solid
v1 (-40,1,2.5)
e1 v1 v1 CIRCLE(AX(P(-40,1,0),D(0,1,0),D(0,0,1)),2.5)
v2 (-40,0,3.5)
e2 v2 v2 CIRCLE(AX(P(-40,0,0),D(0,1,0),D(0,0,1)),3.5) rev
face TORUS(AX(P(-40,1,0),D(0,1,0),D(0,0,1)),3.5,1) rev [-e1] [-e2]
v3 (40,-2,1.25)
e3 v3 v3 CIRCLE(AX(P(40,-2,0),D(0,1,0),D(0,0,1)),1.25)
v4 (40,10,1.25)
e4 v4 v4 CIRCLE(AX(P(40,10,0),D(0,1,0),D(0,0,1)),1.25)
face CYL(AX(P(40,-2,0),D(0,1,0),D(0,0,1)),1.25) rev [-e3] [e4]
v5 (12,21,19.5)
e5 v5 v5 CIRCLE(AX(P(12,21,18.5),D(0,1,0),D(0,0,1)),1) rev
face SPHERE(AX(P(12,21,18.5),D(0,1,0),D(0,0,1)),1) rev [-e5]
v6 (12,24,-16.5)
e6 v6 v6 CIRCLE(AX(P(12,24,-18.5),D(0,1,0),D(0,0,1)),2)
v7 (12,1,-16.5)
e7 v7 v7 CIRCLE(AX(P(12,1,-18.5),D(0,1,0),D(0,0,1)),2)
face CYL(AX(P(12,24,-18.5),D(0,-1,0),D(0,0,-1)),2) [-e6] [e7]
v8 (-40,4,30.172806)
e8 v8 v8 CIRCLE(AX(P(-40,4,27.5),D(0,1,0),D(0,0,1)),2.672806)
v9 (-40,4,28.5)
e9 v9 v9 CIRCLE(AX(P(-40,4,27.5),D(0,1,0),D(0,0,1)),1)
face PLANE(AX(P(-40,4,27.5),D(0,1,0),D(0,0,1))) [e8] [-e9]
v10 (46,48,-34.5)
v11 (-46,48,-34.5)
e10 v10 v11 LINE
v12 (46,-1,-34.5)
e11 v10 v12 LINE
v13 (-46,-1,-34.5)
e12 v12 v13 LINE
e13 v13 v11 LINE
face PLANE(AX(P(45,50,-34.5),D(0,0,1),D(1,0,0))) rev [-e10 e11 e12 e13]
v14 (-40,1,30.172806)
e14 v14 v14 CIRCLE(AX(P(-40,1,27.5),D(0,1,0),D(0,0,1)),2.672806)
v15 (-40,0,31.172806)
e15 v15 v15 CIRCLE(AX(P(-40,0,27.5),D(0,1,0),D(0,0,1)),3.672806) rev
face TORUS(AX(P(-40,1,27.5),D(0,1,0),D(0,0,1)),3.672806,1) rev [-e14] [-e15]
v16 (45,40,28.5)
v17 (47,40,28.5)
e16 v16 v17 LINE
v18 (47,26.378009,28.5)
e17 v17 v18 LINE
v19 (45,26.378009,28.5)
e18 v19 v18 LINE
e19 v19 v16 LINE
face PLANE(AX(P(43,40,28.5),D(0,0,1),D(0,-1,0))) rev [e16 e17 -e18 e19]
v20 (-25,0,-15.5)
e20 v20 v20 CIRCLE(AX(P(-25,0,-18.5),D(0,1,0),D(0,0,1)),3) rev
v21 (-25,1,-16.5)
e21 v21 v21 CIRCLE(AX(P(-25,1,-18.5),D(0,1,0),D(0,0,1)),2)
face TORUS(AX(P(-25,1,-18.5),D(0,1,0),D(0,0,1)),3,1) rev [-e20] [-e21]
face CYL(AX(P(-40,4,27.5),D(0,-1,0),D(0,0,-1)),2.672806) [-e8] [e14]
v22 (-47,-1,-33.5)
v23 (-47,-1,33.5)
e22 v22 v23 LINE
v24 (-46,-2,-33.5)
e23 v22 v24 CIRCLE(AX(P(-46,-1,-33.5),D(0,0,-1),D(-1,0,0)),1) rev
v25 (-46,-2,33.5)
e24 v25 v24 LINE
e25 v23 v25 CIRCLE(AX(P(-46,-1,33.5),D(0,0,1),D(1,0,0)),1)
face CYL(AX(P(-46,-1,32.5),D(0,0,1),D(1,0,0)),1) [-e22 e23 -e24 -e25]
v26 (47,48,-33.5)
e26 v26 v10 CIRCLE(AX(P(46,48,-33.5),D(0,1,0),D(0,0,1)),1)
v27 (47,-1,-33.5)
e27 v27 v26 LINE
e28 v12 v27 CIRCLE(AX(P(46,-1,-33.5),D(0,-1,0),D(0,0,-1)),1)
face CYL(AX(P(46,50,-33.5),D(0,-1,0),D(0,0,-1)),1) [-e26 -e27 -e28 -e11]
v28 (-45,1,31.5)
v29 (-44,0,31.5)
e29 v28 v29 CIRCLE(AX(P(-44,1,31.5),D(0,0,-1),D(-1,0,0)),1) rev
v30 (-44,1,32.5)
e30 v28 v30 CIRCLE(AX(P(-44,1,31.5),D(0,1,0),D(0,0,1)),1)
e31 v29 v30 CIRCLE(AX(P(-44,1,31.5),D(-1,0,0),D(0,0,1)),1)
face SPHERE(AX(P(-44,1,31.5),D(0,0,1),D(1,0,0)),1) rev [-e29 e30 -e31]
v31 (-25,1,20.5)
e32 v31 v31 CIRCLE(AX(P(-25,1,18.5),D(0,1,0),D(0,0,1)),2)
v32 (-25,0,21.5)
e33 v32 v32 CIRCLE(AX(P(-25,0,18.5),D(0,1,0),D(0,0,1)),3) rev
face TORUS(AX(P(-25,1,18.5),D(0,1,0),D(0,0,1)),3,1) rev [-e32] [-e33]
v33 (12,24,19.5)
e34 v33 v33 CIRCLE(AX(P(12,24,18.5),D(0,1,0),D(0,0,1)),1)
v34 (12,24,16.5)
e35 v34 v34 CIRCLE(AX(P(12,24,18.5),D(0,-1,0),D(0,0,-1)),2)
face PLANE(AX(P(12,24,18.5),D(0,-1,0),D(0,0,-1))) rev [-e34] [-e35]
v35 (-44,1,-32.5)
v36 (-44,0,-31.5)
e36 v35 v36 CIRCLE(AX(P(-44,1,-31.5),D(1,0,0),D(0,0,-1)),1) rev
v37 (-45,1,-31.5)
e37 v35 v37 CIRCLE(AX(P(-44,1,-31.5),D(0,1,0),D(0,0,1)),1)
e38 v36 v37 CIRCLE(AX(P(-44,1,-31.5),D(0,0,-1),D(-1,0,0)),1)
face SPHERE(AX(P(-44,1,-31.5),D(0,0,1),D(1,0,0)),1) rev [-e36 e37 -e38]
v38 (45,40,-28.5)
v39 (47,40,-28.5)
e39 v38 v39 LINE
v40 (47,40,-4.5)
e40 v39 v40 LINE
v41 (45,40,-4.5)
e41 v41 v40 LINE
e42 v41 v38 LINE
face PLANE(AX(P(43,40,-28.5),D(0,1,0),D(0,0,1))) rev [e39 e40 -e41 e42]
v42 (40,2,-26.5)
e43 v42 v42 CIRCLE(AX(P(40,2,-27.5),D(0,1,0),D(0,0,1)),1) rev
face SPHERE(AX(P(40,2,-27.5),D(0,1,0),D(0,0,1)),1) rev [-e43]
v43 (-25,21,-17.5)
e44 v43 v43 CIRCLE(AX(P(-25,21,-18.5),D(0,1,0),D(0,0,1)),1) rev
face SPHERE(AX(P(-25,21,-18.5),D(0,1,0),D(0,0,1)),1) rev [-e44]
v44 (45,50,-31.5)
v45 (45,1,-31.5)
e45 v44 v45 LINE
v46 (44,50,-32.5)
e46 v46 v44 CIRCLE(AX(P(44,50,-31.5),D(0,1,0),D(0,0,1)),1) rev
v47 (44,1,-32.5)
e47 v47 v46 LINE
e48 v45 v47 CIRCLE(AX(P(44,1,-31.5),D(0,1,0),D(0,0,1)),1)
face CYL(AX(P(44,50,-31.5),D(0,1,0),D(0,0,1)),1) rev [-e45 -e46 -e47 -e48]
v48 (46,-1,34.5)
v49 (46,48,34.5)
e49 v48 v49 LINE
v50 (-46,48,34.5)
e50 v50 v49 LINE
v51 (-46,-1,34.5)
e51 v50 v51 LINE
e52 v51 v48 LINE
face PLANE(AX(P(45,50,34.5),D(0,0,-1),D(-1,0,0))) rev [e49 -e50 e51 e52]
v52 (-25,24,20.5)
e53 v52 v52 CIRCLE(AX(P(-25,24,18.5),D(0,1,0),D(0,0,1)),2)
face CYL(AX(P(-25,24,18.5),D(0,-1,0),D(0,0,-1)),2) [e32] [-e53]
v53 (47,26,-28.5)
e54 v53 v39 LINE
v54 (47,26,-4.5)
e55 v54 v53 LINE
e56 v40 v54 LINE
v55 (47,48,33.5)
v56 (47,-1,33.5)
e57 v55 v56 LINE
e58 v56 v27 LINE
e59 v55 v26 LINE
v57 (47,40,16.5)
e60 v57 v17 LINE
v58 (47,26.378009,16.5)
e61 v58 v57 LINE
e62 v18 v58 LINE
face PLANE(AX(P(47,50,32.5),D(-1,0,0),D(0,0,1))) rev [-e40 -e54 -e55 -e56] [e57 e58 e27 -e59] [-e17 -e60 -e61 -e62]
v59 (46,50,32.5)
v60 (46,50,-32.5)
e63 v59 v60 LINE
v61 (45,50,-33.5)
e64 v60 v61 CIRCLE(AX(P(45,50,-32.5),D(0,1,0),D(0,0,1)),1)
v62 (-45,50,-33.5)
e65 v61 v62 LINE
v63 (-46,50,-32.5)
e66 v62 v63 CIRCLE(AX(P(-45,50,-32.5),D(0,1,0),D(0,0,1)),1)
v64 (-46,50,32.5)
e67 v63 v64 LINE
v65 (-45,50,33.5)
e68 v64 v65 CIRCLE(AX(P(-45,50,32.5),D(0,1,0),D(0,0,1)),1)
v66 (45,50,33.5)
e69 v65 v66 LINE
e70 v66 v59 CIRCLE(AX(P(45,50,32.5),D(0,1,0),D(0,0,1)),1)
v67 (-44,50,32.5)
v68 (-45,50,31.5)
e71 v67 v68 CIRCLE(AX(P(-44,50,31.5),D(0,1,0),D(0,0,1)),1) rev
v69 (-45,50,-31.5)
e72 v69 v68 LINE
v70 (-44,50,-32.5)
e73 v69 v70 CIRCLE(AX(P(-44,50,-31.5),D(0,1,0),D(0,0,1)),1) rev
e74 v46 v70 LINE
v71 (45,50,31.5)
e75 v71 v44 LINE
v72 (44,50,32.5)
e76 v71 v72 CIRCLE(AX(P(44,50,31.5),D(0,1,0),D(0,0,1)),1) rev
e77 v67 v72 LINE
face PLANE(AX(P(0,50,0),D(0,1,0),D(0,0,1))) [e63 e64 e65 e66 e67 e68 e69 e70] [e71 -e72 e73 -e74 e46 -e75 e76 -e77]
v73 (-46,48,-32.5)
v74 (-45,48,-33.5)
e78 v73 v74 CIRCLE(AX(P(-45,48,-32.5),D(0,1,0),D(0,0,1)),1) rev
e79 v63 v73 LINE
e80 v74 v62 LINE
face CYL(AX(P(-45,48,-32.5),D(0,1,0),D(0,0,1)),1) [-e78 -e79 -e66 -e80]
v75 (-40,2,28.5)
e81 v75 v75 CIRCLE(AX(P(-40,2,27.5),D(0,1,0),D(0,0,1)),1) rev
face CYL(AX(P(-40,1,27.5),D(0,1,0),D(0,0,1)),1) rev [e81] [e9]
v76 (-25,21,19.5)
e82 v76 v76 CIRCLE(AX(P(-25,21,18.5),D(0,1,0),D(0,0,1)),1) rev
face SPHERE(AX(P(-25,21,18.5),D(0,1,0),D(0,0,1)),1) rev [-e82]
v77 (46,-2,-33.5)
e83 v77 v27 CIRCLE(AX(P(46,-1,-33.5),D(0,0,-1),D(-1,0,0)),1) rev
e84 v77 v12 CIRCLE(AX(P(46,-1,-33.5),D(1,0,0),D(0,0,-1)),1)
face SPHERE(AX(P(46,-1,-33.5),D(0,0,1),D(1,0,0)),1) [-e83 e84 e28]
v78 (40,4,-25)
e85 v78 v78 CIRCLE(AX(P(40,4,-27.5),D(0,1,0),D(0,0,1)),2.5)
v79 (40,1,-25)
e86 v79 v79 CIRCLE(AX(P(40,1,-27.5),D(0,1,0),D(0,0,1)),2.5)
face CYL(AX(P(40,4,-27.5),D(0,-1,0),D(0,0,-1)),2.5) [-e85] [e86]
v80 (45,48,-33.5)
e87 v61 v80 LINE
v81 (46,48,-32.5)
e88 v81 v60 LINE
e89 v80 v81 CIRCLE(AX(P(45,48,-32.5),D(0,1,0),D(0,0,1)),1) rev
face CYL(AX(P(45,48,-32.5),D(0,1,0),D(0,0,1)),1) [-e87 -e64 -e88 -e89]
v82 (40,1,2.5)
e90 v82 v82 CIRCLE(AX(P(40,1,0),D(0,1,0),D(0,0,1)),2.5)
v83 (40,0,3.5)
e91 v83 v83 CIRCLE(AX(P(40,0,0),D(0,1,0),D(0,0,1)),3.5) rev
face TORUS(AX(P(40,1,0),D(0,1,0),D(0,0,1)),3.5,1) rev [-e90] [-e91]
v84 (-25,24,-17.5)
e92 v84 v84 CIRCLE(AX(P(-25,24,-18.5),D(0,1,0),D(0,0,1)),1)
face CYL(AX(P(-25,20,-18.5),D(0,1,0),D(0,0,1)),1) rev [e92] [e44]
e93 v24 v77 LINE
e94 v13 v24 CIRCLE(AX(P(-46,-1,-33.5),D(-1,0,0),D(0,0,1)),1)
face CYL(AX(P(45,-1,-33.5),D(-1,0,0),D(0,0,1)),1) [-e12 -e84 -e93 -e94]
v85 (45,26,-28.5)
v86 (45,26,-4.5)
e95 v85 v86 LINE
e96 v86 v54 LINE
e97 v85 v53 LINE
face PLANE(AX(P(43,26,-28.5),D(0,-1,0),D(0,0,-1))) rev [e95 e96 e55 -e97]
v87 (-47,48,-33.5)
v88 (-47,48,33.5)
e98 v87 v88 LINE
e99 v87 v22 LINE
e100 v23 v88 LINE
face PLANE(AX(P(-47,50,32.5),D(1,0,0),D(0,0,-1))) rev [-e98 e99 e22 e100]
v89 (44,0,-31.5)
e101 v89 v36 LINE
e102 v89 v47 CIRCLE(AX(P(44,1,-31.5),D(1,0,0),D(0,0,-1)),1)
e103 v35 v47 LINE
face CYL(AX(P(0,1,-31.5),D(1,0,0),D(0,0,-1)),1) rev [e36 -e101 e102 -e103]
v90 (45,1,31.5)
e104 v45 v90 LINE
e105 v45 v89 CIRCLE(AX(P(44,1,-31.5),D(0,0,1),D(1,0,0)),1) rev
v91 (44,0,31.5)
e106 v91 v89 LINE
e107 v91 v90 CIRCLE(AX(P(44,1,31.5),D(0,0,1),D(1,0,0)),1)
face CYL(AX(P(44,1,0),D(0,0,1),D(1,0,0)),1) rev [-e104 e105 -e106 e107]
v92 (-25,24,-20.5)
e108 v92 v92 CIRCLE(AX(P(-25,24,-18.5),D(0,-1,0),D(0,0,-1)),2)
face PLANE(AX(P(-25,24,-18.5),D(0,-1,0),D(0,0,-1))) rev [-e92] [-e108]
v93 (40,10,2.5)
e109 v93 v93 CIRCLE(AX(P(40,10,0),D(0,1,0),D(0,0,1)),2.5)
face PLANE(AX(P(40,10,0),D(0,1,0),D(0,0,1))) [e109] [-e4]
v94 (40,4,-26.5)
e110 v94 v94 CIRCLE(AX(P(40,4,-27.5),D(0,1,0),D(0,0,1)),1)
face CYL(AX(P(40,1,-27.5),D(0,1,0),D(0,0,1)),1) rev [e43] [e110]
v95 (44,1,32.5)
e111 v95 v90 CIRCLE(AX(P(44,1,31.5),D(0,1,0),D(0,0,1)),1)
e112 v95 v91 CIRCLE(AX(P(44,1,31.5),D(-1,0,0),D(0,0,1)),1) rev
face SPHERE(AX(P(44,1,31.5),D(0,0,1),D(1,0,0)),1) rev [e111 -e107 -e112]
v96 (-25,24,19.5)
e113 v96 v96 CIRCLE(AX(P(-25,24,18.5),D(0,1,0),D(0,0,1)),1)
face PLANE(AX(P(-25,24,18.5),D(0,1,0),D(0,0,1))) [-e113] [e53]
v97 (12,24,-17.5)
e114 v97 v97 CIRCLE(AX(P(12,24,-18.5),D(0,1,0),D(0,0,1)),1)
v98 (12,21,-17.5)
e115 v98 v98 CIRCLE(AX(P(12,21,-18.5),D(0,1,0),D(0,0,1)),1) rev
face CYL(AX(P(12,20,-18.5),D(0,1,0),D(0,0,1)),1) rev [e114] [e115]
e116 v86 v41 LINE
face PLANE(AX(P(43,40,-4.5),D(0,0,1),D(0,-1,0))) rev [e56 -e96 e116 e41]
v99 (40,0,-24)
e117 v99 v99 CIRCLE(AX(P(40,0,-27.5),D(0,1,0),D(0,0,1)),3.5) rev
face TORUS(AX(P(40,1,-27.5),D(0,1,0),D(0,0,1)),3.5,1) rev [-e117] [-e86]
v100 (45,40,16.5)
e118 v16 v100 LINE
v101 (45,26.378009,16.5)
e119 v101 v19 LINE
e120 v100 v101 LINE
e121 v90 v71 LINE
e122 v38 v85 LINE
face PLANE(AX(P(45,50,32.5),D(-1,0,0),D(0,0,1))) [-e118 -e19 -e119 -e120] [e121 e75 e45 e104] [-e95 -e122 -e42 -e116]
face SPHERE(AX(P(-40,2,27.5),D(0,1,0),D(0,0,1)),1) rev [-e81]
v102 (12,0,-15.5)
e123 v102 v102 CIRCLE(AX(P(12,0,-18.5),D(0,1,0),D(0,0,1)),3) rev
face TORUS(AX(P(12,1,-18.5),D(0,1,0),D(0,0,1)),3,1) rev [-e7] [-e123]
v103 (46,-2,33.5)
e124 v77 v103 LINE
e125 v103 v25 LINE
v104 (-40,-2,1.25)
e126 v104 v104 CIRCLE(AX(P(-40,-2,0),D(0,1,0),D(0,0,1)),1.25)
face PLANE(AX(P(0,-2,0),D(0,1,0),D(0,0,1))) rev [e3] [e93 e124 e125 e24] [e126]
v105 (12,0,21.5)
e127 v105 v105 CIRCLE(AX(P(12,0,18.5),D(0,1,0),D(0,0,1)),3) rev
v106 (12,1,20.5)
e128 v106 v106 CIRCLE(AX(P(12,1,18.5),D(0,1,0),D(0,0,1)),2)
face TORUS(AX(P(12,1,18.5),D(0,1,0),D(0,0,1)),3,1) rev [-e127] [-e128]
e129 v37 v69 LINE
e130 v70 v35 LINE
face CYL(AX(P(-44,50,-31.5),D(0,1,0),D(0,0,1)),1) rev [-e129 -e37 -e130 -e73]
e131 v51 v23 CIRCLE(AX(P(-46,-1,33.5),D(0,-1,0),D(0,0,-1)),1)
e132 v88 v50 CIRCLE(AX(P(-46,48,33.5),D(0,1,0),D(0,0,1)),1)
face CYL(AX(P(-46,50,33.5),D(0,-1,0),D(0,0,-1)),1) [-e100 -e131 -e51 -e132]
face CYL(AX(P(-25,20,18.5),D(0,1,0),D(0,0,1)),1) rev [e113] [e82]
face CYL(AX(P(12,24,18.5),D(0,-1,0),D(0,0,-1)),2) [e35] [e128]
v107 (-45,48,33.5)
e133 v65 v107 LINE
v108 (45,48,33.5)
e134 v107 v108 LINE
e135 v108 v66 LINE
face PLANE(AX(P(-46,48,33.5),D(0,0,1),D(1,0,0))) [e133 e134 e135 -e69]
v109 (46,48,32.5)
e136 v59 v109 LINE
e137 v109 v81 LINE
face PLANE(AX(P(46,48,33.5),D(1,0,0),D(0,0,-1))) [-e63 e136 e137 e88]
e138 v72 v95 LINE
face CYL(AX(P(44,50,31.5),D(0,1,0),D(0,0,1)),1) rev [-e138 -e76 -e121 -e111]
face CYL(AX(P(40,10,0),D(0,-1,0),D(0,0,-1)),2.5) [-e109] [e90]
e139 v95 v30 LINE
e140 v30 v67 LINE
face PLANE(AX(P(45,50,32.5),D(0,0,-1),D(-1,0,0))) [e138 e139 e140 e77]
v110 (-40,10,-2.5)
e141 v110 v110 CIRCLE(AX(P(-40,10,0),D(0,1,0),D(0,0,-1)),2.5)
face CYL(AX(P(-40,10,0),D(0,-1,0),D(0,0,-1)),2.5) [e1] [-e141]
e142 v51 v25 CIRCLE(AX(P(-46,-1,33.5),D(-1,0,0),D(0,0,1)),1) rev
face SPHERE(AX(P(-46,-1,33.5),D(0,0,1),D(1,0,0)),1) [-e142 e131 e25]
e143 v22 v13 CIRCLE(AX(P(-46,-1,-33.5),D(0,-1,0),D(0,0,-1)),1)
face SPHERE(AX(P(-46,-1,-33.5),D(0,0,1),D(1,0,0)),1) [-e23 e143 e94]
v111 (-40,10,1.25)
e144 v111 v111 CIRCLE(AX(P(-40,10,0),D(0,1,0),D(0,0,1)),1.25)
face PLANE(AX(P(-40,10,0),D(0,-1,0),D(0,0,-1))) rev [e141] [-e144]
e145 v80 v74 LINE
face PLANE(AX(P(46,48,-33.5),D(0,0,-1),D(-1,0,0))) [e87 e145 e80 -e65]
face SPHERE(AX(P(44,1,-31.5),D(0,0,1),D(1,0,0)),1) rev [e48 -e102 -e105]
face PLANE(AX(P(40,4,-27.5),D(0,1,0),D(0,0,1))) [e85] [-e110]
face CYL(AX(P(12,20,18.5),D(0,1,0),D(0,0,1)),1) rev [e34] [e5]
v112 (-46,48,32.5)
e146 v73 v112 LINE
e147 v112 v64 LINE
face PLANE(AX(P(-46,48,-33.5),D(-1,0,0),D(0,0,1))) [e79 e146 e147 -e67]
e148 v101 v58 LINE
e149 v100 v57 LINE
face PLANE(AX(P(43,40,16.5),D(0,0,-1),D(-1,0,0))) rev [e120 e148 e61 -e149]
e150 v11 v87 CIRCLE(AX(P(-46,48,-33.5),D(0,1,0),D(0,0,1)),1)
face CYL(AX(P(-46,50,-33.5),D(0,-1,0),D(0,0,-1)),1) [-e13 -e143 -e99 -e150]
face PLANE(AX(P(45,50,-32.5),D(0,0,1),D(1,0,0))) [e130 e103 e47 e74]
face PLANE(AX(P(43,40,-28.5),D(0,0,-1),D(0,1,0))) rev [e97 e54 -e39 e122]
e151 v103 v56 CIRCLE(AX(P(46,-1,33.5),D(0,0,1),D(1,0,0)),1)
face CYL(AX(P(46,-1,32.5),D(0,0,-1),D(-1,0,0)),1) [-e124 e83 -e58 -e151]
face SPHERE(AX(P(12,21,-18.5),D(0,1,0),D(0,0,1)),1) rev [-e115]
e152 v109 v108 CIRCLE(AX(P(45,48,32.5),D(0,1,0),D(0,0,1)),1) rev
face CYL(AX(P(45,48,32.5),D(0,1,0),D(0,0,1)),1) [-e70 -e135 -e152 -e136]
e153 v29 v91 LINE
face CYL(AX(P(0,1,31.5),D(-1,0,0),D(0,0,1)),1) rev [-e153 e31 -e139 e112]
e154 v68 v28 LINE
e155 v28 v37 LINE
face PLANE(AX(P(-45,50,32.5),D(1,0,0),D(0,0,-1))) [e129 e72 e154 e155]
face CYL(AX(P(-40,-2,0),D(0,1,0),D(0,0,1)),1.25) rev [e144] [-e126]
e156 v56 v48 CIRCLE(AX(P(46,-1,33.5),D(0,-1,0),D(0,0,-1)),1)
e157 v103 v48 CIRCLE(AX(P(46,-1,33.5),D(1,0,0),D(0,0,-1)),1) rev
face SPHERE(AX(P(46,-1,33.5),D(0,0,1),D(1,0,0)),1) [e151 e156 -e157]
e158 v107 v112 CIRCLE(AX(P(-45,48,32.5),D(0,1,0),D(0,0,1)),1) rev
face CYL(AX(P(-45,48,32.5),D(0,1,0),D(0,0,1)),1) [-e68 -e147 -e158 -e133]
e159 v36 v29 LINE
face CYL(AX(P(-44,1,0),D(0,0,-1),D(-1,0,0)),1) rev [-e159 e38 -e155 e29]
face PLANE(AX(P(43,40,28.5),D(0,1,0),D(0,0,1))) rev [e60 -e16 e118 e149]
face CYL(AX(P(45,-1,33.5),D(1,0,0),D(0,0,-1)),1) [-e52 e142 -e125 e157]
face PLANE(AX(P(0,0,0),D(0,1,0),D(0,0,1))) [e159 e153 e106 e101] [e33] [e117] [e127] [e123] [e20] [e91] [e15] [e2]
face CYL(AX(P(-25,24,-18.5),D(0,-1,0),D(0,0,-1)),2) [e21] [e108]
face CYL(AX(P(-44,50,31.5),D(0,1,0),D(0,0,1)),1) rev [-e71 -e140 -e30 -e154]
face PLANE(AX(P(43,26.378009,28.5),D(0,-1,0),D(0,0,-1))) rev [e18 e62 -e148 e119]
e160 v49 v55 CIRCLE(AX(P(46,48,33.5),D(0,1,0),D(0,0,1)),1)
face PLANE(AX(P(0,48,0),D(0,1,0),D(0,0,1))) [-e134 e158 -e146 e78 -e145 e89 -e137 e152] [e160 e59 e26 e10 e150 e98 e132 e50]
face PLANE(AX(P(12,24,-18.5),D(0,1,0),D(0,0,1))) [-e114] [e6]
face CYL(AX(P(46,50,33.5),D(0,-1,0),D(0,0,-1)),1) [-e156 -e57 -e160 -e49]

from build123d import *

# Parameters (mm, degrees)
SKETCH1_W            = 90
SKETCH1_H            = 65
BOSS_EXTRUDE1_DEPTH  = 50
SHELL1_T             = 2
SKETCH2_R            = 2.5
BOSS_EXTRUDE2_DEPTH  = 10
SKETCH3_R            = 2.5
SKETCH3_R_2          = 2.67280604
BOSS_EXTRUDE3_DEPTH  = 4
SKETCH5_R            = 1
CUT_EXTRUDE1_DEPTH   = 3
SKETCH7_R            = 2
BOSS_EXTRUDE5_DEPTH  = 24
SKETCH11_R           = 1
CUT_EXTRUDE2_DEPTH   = 4
SKETCH12_W           = 24
SKETCH12_H           = 14
SKETCH12_W_2         = 12
SKETCH12_H_2         = 13.621990599
CUT_EXTRUDE3_DEPTH   = 4
SKETCH13_OUTSIDE_W   = 121.536
SKETCH13_OUTSIDE_H   = 96.536
SKETCH13_OUTSIDE_W_2 = 92
SKETCH13_OUTSIDE_H_2 = 67
CUT_EXTRUDE4_DEPTH   = 2
FILLET1_R            = 1
FILLET2_R            = 1
FILLET3_R            = 1
FILLET4_R            = 1
FILLET5_R            = 1
FILLET6_R            = 1
FILLET7_R            = 1
SKETCH15_R           = 1.25
CUT_EXTRUDE5_DEPTH   = 71.705374619


with BuildPart() as part:
    # Sketch1 → Boss-Extrude1 (new body)
    with BuildSketch(Plane(origin=(0, 0, 0), x_dir=(1, 0, 0), z_dir=(0, 1, 0))):
        Rectangle(SKETCH1_W, SKETCH1_H)
    extrude(amount=BOSS_EXTRUDE1_DEPTH)

    # Shell1
    shell1_openings = [part.faces().sort_by_distance(p)[0] for p in [
        (0, 50, 0),
    ]]
    offset(amount=SHELL1_T, openings=shell1_openings, kind=Kind.INTERSECTION)

    # Sketch2 → Boss-Extrude2 (add)
    with BuildSketch(Plane(origin=(0, 0, 0), x_dir=(1, 0, 0), z_dir=(0, 1, 0))):
        with Locations(Location((40, 0, 0), (0, 0, 270))):
            Circle(SKETCH2_R)
        with Locations(Location((-40, 0, 0), (0, 0, 90))):
            Circle(SKETCH2_R)
    extrude(amount=BOSS_EXTRUDE2_DEPTH)

    # Sketch3 → Boss-Extrude3 (add)
    with BuildSketch(Plane(origin=(0, 0, 0), x_dir=(1, 0, 0), z_dir=(0, 1, 0))):
        with Locations(Location((40, 27.5, 0), (0, 0, 270))):
            Circle(SKETCH3_R)
        with Locations(Location((-40, -27.5, 0), (0, 0, 270))):
            Circle(SKETCH3_R_2)
    extrude(amount=BOSS_EXTRUDE3_DEPTH)

    # Sketch5 → Cut-Extrude1 (cut)
    with BuildSketch(Plane(origin=(0, 4, 0), x_dir=(1, 0, 0), z_dir=(0, 1, 0))):
        with Locations(Location((40, 27.5, 0), (0, 0, 270))):
            Circle(SKETCH5_R)
        with Locations(Location((-40, -27.5, 0), (0, 0, 270))):
            Circle(SKETCH5_R)
    extrude(amount=-CUT_EXTRUDE1_DEPTH, mode=Mode.SUBTRACT)

    # Sketch7 → Boss-Extrude5 (add)
    with BuildSketch(Plane(origin=(0, 0, 0), x_dir=(1, 0, 0), z_dir=(0, 1, 0))):
        with Locations(Location((-25, -18.5, 0), (0, 0, 270))):
            Circle(SKETCH7_R)
        with Locations(Location((-25, 18.5, 0), (0, 0, 90))):
            Circle(SKETCH7_R)
        with Locations(Location((12, 18.5, 0), (0, 0, 270))):
            Circle(SKETCH7_R)
        with Locations(Location((12, -18.5, 0), (0, 0, 90))):
            Circle(SKETCH7_R)
    extrude(amount=BOSS_EXTRUDE5_DEPTH)

    # Sketch11 → Cut-Extrude2 (cut)
    with BuildSketch(Plane(origin=(0, 24, 0), x_dir=(1, 0, 0), z_dir=(0, 1, 0))):
        with Locations(Location((12, 18.5, 0), (0, 0, 270))):
            Circle(SKETCH11_R)
        with Locations(Location((-25, 18.5, 0), (0, 0, 270))):
            Circle(SKETCH11_R)
        with Locations(Location((-25, -18.5, 0), (0, 0, 270))):
            Circle(SKETCH11_R)
        with Locations(Location((12, -18.5, 0), (0, 0, 270))):
            Circle(SKETCH11_R)
    extrude(amount=-CUT_EXTRUDE2_DEPTH, mode=Mode.SUBTRACT)

    # Sketch12 → Cut-Extrude3 (cut)
    with BuildSketch(Plane(origin=(47, 0, 0), x_dir=(0, 0, -1), z_dir=(1, 0, 0))):
        with Locations((16.5, 33)):
            Rectangle(SKETCH12_W, SKETCH12_H)
        with Locations((-22.5, 33.1890047)):
            Rectangle(SKETCH12_W_2, SKETCH12_H_2)
    extrude(amount=-CUT_EXTRUDE3_DEPTH, mode=Mode.SUBTRACT)

    # Sketch13 outside → Cut-Extrude4 (cut)
    with BuildSketch(Plane(origin=(0, 50, 0), x_dir=(1, 0, 0), z_dir=(0, 1, 0))):
        Rectangle(SKETCH13_OUTSIDE_W, SKETCH13_OUTSIDE_H)
        Rectangle(SKETCH13_OUTSIDE_W_2, SKETCH13_OUTSIDE_H_2, mode=Mode.SUBTRACT)
    extrude(amount=-CUT_EXTRUDE4_DEPTH, mode=Mode.SUBTRACT)

    # Fillet1
    fillet1_edges = [part.edges().sort_by_distance(p)[0] for p in [
        (-45, 0, 0),
        (0, 0, 32.5),
        (45, 0, 0),
        (0, 0, -32.5),
    ]]
    fillet(fillet1_edges, radius=FILLET1_R)

    # Fillet2
    # the kernel refuses this fillet: 1 mm, written as the material it adds along each edge
    with BuildSketch(Plane(origin=(44, 1, 31.5), x_dir=(1, 0, 0), z_dir=(0, 0, 1))) as fillet2_piece_1_section:
        Polygon((0, 0), (FILLET2_R, 0), (FILLET2_R, -FILLET2_R), (0, -FILLET2_R), align=None)
    fillet2_piece_1 = extrude(amount=FILLET2_R, mode=Mode.PRIVATE)
    fillet2_piece_1 = fillet2_piece_1 - Plane(origin=(44, 1, 31.5), x_dir=(-0.7071067811865475, 0.7071067811865475, 0), z_dir=(0, 0, 1)) * Sphere(FILLET2_R, mode=Mode.PRIVATE)
    add(fillet2_piece_1)
    with BuildSketch(Plane(origin=(-44, 1, 31.5), x_dir=(-1, 0, 0), z_dir=(0, 0, 1))) as fillet2_piece_2_section:
        Polygon((0, 0), (FILLET2_R, 0), (FILLET2_R, FILLET2_R), (0, FILLET2_R), align=None)
    fillet2_piece_2 = extrude(amount=FILLET2_R, mode=Mode.PRIVATE)
    fillet2_piece_2 = fillet2_piece_2 - Plane(origin=(-44, 1, 31.5), x_dir=(0.7071067811865475, 0.7071067811865475, 0), z_dir=(0, 0, 1)) * Sphere(FILLET2_R, mode=Mode.PRIVATE)
    add(fillet2_piece_2)
    with BuildSketch(Plane(origin=(44, 1, -31.5), x_dir=(0, 0, -1), z_dir=(1, 0, 0))) as fillet2_piece_3_section:
        Polygon((0, 0), (FILLET2_R, 0), (FILLET2_R, -FILLET2_R), (0, -FILLET2_R), align=None)
    fillet2_piece_3 = extrude(amount=FILLET2_R, mode=Mode.PRIVATE)
    fillet2_piece_3 = fillet2_piece_3 - Plane(origin=(44, 1, -31.5), x_dir=(0, 0.7071067811865475, 0.7071067811865475), z_dir=(1, 0, 0)) * Sphere(FILLET2_R, mode=Mode.PRIVATE)
    add(fillet2_piece_3)
    with BuildSketch(Plane(origin=(-44, 1, -31.5), x_dir=(0, 0, -1), z_dir=(-1, 0, 0))) as fillet2_piece_4_section:
        Polygon((0, 0), (FILLET2_R, 0), (FILLET2_R, FILLET2_R), (0, FILLET2_R), align=None)
    fillet2_piece_4 = extrude(amount=FILLET2_R, mode=Mode.PRIVATE)
    fillet2_piece_4 = fillet2_piece_4 - Plane(origin=(-44, 1, -31.5), x_dir=(0, 0.7071067811865475, 0.7071067811865475), z_dir=(-1, 0, 0)) * Sphere(FILLET2_R, mode=Mode.PRIVATE)
    add(fillet2_piece_4)
    with BuildSketch(Plane(origin=(-45, 1, -32.5), x_dir=(0, 0, 1), z_dir=(0, 1, 0)), Plane(origin=(-45, 1, 32.5), x_dir=(1, 0, 0), z_dir=(0, 1, 0))) as fillet2_piece_5:
        with BuildLine():
            CenterArc((FILLET2_R, FILLET2_R), FILLET2_R, 180, 90)
            Line((0, FILLET2_R), (0, 0))
            Line((0, 0), (FILLET2_R, 0))
        make_face()
    extrude(amount=49)
    with BuildSketch(Plane(origin=(45, 1, 32.5), x_dir=(-1, 0, 0), z_dir=(0, 1, 0)), Plane(origin=(45, 1, -32.5), x_dir=(0, 0, 1), z_dir=(0, 1, 0))) as fillet2_piece_6:
        with BuildLine():
            CenterArc((FILLET2_R, -FILLET2_R), FILLET2_R, 90, 90)
            Line((0, -FILLET2_R), (0, 0))
            Line((0, 0), (FILLET2_R, 0))
        make_face()
    extrude(amount=49)

    # Fillet3
    fillet3_edges = [part.edges().sort_by_distance(p)[0] for p in [
        (40, 0, -2.5),
        (-40, 0, 2.5),
        (40, 0, -30),
        (-40, 0, 24.82719396),
        (12, 0, -20.5),
        (-25, 0, 16.5),
        (-25, 0, -16.5),
        (12, 0, 20.5),
    ]]
    fillet(fillet3_edges, radius=FILLET3_R)

    # Fillet4
    fillet4_edges = [part.edges().sort_by_distance(p)[0] for p in [
        (-47, 23, -34.5),
        (47, 23, -34.5),
        (47, 23, 34.5),
        (-47, 23, 34.5),
        (0, -2, -34.5),
        (47, -2, 0),
        (0, -2, 34.5),
        (-47, -2, 0),
    ]]
    fillet(fillet4_edges, radius=FILLET4_R)

    # Fillet5
    fillet5_edges = [part.edges().sort_by_distance(p)[0] for p in [
        (-46, 49, 33.5),
        (-46, 49, -33.5),
        (46, 49, -33.5),
        (46, 49, 33.5),
    ]]
    fillet(fillet5_edges, radius=FILLET5_R)

    # Fillet6
    fillet6_edges = [part.edges().sort_by_distance(p)[0] for p in [
        (12, 20, -19.5),
        (-25, 20, -19.5),
        (-25, 20, 17.5),
        (12, 20, 17.5),
    ]]
    fillet(fillet6_edges, radius=FILLET6_R)

    # Fillet7
    fillet7_edges = [part.edges().sort_by_distance(p)[0] for p in [
        (40, 1, -28.5),
        (-40, 1, 26.5),
    ]]
    fillet(fillet7_edges, radius=FILLET7_R)

    # Sketch15 → Cut-Extrude5 (cut, through all)
    with BuildSketch(Plane(origin=(0, 10, 0), x_dir=(1, 0, 0), z_dir=(0, 1, 0))):
        with Locations(Location((-40, 0, 0), (0, 0, 270))):
            Circle(SKETCH15_R)
        with Locations(Location((40, 0, 0), (0, 0, 270))):
            Circle(SKETCH15_R)
    extrude(amount=-CUT_EXTRUDE5_DEPTH, mode=Mode.SUBTRACT)


solid = part.part
